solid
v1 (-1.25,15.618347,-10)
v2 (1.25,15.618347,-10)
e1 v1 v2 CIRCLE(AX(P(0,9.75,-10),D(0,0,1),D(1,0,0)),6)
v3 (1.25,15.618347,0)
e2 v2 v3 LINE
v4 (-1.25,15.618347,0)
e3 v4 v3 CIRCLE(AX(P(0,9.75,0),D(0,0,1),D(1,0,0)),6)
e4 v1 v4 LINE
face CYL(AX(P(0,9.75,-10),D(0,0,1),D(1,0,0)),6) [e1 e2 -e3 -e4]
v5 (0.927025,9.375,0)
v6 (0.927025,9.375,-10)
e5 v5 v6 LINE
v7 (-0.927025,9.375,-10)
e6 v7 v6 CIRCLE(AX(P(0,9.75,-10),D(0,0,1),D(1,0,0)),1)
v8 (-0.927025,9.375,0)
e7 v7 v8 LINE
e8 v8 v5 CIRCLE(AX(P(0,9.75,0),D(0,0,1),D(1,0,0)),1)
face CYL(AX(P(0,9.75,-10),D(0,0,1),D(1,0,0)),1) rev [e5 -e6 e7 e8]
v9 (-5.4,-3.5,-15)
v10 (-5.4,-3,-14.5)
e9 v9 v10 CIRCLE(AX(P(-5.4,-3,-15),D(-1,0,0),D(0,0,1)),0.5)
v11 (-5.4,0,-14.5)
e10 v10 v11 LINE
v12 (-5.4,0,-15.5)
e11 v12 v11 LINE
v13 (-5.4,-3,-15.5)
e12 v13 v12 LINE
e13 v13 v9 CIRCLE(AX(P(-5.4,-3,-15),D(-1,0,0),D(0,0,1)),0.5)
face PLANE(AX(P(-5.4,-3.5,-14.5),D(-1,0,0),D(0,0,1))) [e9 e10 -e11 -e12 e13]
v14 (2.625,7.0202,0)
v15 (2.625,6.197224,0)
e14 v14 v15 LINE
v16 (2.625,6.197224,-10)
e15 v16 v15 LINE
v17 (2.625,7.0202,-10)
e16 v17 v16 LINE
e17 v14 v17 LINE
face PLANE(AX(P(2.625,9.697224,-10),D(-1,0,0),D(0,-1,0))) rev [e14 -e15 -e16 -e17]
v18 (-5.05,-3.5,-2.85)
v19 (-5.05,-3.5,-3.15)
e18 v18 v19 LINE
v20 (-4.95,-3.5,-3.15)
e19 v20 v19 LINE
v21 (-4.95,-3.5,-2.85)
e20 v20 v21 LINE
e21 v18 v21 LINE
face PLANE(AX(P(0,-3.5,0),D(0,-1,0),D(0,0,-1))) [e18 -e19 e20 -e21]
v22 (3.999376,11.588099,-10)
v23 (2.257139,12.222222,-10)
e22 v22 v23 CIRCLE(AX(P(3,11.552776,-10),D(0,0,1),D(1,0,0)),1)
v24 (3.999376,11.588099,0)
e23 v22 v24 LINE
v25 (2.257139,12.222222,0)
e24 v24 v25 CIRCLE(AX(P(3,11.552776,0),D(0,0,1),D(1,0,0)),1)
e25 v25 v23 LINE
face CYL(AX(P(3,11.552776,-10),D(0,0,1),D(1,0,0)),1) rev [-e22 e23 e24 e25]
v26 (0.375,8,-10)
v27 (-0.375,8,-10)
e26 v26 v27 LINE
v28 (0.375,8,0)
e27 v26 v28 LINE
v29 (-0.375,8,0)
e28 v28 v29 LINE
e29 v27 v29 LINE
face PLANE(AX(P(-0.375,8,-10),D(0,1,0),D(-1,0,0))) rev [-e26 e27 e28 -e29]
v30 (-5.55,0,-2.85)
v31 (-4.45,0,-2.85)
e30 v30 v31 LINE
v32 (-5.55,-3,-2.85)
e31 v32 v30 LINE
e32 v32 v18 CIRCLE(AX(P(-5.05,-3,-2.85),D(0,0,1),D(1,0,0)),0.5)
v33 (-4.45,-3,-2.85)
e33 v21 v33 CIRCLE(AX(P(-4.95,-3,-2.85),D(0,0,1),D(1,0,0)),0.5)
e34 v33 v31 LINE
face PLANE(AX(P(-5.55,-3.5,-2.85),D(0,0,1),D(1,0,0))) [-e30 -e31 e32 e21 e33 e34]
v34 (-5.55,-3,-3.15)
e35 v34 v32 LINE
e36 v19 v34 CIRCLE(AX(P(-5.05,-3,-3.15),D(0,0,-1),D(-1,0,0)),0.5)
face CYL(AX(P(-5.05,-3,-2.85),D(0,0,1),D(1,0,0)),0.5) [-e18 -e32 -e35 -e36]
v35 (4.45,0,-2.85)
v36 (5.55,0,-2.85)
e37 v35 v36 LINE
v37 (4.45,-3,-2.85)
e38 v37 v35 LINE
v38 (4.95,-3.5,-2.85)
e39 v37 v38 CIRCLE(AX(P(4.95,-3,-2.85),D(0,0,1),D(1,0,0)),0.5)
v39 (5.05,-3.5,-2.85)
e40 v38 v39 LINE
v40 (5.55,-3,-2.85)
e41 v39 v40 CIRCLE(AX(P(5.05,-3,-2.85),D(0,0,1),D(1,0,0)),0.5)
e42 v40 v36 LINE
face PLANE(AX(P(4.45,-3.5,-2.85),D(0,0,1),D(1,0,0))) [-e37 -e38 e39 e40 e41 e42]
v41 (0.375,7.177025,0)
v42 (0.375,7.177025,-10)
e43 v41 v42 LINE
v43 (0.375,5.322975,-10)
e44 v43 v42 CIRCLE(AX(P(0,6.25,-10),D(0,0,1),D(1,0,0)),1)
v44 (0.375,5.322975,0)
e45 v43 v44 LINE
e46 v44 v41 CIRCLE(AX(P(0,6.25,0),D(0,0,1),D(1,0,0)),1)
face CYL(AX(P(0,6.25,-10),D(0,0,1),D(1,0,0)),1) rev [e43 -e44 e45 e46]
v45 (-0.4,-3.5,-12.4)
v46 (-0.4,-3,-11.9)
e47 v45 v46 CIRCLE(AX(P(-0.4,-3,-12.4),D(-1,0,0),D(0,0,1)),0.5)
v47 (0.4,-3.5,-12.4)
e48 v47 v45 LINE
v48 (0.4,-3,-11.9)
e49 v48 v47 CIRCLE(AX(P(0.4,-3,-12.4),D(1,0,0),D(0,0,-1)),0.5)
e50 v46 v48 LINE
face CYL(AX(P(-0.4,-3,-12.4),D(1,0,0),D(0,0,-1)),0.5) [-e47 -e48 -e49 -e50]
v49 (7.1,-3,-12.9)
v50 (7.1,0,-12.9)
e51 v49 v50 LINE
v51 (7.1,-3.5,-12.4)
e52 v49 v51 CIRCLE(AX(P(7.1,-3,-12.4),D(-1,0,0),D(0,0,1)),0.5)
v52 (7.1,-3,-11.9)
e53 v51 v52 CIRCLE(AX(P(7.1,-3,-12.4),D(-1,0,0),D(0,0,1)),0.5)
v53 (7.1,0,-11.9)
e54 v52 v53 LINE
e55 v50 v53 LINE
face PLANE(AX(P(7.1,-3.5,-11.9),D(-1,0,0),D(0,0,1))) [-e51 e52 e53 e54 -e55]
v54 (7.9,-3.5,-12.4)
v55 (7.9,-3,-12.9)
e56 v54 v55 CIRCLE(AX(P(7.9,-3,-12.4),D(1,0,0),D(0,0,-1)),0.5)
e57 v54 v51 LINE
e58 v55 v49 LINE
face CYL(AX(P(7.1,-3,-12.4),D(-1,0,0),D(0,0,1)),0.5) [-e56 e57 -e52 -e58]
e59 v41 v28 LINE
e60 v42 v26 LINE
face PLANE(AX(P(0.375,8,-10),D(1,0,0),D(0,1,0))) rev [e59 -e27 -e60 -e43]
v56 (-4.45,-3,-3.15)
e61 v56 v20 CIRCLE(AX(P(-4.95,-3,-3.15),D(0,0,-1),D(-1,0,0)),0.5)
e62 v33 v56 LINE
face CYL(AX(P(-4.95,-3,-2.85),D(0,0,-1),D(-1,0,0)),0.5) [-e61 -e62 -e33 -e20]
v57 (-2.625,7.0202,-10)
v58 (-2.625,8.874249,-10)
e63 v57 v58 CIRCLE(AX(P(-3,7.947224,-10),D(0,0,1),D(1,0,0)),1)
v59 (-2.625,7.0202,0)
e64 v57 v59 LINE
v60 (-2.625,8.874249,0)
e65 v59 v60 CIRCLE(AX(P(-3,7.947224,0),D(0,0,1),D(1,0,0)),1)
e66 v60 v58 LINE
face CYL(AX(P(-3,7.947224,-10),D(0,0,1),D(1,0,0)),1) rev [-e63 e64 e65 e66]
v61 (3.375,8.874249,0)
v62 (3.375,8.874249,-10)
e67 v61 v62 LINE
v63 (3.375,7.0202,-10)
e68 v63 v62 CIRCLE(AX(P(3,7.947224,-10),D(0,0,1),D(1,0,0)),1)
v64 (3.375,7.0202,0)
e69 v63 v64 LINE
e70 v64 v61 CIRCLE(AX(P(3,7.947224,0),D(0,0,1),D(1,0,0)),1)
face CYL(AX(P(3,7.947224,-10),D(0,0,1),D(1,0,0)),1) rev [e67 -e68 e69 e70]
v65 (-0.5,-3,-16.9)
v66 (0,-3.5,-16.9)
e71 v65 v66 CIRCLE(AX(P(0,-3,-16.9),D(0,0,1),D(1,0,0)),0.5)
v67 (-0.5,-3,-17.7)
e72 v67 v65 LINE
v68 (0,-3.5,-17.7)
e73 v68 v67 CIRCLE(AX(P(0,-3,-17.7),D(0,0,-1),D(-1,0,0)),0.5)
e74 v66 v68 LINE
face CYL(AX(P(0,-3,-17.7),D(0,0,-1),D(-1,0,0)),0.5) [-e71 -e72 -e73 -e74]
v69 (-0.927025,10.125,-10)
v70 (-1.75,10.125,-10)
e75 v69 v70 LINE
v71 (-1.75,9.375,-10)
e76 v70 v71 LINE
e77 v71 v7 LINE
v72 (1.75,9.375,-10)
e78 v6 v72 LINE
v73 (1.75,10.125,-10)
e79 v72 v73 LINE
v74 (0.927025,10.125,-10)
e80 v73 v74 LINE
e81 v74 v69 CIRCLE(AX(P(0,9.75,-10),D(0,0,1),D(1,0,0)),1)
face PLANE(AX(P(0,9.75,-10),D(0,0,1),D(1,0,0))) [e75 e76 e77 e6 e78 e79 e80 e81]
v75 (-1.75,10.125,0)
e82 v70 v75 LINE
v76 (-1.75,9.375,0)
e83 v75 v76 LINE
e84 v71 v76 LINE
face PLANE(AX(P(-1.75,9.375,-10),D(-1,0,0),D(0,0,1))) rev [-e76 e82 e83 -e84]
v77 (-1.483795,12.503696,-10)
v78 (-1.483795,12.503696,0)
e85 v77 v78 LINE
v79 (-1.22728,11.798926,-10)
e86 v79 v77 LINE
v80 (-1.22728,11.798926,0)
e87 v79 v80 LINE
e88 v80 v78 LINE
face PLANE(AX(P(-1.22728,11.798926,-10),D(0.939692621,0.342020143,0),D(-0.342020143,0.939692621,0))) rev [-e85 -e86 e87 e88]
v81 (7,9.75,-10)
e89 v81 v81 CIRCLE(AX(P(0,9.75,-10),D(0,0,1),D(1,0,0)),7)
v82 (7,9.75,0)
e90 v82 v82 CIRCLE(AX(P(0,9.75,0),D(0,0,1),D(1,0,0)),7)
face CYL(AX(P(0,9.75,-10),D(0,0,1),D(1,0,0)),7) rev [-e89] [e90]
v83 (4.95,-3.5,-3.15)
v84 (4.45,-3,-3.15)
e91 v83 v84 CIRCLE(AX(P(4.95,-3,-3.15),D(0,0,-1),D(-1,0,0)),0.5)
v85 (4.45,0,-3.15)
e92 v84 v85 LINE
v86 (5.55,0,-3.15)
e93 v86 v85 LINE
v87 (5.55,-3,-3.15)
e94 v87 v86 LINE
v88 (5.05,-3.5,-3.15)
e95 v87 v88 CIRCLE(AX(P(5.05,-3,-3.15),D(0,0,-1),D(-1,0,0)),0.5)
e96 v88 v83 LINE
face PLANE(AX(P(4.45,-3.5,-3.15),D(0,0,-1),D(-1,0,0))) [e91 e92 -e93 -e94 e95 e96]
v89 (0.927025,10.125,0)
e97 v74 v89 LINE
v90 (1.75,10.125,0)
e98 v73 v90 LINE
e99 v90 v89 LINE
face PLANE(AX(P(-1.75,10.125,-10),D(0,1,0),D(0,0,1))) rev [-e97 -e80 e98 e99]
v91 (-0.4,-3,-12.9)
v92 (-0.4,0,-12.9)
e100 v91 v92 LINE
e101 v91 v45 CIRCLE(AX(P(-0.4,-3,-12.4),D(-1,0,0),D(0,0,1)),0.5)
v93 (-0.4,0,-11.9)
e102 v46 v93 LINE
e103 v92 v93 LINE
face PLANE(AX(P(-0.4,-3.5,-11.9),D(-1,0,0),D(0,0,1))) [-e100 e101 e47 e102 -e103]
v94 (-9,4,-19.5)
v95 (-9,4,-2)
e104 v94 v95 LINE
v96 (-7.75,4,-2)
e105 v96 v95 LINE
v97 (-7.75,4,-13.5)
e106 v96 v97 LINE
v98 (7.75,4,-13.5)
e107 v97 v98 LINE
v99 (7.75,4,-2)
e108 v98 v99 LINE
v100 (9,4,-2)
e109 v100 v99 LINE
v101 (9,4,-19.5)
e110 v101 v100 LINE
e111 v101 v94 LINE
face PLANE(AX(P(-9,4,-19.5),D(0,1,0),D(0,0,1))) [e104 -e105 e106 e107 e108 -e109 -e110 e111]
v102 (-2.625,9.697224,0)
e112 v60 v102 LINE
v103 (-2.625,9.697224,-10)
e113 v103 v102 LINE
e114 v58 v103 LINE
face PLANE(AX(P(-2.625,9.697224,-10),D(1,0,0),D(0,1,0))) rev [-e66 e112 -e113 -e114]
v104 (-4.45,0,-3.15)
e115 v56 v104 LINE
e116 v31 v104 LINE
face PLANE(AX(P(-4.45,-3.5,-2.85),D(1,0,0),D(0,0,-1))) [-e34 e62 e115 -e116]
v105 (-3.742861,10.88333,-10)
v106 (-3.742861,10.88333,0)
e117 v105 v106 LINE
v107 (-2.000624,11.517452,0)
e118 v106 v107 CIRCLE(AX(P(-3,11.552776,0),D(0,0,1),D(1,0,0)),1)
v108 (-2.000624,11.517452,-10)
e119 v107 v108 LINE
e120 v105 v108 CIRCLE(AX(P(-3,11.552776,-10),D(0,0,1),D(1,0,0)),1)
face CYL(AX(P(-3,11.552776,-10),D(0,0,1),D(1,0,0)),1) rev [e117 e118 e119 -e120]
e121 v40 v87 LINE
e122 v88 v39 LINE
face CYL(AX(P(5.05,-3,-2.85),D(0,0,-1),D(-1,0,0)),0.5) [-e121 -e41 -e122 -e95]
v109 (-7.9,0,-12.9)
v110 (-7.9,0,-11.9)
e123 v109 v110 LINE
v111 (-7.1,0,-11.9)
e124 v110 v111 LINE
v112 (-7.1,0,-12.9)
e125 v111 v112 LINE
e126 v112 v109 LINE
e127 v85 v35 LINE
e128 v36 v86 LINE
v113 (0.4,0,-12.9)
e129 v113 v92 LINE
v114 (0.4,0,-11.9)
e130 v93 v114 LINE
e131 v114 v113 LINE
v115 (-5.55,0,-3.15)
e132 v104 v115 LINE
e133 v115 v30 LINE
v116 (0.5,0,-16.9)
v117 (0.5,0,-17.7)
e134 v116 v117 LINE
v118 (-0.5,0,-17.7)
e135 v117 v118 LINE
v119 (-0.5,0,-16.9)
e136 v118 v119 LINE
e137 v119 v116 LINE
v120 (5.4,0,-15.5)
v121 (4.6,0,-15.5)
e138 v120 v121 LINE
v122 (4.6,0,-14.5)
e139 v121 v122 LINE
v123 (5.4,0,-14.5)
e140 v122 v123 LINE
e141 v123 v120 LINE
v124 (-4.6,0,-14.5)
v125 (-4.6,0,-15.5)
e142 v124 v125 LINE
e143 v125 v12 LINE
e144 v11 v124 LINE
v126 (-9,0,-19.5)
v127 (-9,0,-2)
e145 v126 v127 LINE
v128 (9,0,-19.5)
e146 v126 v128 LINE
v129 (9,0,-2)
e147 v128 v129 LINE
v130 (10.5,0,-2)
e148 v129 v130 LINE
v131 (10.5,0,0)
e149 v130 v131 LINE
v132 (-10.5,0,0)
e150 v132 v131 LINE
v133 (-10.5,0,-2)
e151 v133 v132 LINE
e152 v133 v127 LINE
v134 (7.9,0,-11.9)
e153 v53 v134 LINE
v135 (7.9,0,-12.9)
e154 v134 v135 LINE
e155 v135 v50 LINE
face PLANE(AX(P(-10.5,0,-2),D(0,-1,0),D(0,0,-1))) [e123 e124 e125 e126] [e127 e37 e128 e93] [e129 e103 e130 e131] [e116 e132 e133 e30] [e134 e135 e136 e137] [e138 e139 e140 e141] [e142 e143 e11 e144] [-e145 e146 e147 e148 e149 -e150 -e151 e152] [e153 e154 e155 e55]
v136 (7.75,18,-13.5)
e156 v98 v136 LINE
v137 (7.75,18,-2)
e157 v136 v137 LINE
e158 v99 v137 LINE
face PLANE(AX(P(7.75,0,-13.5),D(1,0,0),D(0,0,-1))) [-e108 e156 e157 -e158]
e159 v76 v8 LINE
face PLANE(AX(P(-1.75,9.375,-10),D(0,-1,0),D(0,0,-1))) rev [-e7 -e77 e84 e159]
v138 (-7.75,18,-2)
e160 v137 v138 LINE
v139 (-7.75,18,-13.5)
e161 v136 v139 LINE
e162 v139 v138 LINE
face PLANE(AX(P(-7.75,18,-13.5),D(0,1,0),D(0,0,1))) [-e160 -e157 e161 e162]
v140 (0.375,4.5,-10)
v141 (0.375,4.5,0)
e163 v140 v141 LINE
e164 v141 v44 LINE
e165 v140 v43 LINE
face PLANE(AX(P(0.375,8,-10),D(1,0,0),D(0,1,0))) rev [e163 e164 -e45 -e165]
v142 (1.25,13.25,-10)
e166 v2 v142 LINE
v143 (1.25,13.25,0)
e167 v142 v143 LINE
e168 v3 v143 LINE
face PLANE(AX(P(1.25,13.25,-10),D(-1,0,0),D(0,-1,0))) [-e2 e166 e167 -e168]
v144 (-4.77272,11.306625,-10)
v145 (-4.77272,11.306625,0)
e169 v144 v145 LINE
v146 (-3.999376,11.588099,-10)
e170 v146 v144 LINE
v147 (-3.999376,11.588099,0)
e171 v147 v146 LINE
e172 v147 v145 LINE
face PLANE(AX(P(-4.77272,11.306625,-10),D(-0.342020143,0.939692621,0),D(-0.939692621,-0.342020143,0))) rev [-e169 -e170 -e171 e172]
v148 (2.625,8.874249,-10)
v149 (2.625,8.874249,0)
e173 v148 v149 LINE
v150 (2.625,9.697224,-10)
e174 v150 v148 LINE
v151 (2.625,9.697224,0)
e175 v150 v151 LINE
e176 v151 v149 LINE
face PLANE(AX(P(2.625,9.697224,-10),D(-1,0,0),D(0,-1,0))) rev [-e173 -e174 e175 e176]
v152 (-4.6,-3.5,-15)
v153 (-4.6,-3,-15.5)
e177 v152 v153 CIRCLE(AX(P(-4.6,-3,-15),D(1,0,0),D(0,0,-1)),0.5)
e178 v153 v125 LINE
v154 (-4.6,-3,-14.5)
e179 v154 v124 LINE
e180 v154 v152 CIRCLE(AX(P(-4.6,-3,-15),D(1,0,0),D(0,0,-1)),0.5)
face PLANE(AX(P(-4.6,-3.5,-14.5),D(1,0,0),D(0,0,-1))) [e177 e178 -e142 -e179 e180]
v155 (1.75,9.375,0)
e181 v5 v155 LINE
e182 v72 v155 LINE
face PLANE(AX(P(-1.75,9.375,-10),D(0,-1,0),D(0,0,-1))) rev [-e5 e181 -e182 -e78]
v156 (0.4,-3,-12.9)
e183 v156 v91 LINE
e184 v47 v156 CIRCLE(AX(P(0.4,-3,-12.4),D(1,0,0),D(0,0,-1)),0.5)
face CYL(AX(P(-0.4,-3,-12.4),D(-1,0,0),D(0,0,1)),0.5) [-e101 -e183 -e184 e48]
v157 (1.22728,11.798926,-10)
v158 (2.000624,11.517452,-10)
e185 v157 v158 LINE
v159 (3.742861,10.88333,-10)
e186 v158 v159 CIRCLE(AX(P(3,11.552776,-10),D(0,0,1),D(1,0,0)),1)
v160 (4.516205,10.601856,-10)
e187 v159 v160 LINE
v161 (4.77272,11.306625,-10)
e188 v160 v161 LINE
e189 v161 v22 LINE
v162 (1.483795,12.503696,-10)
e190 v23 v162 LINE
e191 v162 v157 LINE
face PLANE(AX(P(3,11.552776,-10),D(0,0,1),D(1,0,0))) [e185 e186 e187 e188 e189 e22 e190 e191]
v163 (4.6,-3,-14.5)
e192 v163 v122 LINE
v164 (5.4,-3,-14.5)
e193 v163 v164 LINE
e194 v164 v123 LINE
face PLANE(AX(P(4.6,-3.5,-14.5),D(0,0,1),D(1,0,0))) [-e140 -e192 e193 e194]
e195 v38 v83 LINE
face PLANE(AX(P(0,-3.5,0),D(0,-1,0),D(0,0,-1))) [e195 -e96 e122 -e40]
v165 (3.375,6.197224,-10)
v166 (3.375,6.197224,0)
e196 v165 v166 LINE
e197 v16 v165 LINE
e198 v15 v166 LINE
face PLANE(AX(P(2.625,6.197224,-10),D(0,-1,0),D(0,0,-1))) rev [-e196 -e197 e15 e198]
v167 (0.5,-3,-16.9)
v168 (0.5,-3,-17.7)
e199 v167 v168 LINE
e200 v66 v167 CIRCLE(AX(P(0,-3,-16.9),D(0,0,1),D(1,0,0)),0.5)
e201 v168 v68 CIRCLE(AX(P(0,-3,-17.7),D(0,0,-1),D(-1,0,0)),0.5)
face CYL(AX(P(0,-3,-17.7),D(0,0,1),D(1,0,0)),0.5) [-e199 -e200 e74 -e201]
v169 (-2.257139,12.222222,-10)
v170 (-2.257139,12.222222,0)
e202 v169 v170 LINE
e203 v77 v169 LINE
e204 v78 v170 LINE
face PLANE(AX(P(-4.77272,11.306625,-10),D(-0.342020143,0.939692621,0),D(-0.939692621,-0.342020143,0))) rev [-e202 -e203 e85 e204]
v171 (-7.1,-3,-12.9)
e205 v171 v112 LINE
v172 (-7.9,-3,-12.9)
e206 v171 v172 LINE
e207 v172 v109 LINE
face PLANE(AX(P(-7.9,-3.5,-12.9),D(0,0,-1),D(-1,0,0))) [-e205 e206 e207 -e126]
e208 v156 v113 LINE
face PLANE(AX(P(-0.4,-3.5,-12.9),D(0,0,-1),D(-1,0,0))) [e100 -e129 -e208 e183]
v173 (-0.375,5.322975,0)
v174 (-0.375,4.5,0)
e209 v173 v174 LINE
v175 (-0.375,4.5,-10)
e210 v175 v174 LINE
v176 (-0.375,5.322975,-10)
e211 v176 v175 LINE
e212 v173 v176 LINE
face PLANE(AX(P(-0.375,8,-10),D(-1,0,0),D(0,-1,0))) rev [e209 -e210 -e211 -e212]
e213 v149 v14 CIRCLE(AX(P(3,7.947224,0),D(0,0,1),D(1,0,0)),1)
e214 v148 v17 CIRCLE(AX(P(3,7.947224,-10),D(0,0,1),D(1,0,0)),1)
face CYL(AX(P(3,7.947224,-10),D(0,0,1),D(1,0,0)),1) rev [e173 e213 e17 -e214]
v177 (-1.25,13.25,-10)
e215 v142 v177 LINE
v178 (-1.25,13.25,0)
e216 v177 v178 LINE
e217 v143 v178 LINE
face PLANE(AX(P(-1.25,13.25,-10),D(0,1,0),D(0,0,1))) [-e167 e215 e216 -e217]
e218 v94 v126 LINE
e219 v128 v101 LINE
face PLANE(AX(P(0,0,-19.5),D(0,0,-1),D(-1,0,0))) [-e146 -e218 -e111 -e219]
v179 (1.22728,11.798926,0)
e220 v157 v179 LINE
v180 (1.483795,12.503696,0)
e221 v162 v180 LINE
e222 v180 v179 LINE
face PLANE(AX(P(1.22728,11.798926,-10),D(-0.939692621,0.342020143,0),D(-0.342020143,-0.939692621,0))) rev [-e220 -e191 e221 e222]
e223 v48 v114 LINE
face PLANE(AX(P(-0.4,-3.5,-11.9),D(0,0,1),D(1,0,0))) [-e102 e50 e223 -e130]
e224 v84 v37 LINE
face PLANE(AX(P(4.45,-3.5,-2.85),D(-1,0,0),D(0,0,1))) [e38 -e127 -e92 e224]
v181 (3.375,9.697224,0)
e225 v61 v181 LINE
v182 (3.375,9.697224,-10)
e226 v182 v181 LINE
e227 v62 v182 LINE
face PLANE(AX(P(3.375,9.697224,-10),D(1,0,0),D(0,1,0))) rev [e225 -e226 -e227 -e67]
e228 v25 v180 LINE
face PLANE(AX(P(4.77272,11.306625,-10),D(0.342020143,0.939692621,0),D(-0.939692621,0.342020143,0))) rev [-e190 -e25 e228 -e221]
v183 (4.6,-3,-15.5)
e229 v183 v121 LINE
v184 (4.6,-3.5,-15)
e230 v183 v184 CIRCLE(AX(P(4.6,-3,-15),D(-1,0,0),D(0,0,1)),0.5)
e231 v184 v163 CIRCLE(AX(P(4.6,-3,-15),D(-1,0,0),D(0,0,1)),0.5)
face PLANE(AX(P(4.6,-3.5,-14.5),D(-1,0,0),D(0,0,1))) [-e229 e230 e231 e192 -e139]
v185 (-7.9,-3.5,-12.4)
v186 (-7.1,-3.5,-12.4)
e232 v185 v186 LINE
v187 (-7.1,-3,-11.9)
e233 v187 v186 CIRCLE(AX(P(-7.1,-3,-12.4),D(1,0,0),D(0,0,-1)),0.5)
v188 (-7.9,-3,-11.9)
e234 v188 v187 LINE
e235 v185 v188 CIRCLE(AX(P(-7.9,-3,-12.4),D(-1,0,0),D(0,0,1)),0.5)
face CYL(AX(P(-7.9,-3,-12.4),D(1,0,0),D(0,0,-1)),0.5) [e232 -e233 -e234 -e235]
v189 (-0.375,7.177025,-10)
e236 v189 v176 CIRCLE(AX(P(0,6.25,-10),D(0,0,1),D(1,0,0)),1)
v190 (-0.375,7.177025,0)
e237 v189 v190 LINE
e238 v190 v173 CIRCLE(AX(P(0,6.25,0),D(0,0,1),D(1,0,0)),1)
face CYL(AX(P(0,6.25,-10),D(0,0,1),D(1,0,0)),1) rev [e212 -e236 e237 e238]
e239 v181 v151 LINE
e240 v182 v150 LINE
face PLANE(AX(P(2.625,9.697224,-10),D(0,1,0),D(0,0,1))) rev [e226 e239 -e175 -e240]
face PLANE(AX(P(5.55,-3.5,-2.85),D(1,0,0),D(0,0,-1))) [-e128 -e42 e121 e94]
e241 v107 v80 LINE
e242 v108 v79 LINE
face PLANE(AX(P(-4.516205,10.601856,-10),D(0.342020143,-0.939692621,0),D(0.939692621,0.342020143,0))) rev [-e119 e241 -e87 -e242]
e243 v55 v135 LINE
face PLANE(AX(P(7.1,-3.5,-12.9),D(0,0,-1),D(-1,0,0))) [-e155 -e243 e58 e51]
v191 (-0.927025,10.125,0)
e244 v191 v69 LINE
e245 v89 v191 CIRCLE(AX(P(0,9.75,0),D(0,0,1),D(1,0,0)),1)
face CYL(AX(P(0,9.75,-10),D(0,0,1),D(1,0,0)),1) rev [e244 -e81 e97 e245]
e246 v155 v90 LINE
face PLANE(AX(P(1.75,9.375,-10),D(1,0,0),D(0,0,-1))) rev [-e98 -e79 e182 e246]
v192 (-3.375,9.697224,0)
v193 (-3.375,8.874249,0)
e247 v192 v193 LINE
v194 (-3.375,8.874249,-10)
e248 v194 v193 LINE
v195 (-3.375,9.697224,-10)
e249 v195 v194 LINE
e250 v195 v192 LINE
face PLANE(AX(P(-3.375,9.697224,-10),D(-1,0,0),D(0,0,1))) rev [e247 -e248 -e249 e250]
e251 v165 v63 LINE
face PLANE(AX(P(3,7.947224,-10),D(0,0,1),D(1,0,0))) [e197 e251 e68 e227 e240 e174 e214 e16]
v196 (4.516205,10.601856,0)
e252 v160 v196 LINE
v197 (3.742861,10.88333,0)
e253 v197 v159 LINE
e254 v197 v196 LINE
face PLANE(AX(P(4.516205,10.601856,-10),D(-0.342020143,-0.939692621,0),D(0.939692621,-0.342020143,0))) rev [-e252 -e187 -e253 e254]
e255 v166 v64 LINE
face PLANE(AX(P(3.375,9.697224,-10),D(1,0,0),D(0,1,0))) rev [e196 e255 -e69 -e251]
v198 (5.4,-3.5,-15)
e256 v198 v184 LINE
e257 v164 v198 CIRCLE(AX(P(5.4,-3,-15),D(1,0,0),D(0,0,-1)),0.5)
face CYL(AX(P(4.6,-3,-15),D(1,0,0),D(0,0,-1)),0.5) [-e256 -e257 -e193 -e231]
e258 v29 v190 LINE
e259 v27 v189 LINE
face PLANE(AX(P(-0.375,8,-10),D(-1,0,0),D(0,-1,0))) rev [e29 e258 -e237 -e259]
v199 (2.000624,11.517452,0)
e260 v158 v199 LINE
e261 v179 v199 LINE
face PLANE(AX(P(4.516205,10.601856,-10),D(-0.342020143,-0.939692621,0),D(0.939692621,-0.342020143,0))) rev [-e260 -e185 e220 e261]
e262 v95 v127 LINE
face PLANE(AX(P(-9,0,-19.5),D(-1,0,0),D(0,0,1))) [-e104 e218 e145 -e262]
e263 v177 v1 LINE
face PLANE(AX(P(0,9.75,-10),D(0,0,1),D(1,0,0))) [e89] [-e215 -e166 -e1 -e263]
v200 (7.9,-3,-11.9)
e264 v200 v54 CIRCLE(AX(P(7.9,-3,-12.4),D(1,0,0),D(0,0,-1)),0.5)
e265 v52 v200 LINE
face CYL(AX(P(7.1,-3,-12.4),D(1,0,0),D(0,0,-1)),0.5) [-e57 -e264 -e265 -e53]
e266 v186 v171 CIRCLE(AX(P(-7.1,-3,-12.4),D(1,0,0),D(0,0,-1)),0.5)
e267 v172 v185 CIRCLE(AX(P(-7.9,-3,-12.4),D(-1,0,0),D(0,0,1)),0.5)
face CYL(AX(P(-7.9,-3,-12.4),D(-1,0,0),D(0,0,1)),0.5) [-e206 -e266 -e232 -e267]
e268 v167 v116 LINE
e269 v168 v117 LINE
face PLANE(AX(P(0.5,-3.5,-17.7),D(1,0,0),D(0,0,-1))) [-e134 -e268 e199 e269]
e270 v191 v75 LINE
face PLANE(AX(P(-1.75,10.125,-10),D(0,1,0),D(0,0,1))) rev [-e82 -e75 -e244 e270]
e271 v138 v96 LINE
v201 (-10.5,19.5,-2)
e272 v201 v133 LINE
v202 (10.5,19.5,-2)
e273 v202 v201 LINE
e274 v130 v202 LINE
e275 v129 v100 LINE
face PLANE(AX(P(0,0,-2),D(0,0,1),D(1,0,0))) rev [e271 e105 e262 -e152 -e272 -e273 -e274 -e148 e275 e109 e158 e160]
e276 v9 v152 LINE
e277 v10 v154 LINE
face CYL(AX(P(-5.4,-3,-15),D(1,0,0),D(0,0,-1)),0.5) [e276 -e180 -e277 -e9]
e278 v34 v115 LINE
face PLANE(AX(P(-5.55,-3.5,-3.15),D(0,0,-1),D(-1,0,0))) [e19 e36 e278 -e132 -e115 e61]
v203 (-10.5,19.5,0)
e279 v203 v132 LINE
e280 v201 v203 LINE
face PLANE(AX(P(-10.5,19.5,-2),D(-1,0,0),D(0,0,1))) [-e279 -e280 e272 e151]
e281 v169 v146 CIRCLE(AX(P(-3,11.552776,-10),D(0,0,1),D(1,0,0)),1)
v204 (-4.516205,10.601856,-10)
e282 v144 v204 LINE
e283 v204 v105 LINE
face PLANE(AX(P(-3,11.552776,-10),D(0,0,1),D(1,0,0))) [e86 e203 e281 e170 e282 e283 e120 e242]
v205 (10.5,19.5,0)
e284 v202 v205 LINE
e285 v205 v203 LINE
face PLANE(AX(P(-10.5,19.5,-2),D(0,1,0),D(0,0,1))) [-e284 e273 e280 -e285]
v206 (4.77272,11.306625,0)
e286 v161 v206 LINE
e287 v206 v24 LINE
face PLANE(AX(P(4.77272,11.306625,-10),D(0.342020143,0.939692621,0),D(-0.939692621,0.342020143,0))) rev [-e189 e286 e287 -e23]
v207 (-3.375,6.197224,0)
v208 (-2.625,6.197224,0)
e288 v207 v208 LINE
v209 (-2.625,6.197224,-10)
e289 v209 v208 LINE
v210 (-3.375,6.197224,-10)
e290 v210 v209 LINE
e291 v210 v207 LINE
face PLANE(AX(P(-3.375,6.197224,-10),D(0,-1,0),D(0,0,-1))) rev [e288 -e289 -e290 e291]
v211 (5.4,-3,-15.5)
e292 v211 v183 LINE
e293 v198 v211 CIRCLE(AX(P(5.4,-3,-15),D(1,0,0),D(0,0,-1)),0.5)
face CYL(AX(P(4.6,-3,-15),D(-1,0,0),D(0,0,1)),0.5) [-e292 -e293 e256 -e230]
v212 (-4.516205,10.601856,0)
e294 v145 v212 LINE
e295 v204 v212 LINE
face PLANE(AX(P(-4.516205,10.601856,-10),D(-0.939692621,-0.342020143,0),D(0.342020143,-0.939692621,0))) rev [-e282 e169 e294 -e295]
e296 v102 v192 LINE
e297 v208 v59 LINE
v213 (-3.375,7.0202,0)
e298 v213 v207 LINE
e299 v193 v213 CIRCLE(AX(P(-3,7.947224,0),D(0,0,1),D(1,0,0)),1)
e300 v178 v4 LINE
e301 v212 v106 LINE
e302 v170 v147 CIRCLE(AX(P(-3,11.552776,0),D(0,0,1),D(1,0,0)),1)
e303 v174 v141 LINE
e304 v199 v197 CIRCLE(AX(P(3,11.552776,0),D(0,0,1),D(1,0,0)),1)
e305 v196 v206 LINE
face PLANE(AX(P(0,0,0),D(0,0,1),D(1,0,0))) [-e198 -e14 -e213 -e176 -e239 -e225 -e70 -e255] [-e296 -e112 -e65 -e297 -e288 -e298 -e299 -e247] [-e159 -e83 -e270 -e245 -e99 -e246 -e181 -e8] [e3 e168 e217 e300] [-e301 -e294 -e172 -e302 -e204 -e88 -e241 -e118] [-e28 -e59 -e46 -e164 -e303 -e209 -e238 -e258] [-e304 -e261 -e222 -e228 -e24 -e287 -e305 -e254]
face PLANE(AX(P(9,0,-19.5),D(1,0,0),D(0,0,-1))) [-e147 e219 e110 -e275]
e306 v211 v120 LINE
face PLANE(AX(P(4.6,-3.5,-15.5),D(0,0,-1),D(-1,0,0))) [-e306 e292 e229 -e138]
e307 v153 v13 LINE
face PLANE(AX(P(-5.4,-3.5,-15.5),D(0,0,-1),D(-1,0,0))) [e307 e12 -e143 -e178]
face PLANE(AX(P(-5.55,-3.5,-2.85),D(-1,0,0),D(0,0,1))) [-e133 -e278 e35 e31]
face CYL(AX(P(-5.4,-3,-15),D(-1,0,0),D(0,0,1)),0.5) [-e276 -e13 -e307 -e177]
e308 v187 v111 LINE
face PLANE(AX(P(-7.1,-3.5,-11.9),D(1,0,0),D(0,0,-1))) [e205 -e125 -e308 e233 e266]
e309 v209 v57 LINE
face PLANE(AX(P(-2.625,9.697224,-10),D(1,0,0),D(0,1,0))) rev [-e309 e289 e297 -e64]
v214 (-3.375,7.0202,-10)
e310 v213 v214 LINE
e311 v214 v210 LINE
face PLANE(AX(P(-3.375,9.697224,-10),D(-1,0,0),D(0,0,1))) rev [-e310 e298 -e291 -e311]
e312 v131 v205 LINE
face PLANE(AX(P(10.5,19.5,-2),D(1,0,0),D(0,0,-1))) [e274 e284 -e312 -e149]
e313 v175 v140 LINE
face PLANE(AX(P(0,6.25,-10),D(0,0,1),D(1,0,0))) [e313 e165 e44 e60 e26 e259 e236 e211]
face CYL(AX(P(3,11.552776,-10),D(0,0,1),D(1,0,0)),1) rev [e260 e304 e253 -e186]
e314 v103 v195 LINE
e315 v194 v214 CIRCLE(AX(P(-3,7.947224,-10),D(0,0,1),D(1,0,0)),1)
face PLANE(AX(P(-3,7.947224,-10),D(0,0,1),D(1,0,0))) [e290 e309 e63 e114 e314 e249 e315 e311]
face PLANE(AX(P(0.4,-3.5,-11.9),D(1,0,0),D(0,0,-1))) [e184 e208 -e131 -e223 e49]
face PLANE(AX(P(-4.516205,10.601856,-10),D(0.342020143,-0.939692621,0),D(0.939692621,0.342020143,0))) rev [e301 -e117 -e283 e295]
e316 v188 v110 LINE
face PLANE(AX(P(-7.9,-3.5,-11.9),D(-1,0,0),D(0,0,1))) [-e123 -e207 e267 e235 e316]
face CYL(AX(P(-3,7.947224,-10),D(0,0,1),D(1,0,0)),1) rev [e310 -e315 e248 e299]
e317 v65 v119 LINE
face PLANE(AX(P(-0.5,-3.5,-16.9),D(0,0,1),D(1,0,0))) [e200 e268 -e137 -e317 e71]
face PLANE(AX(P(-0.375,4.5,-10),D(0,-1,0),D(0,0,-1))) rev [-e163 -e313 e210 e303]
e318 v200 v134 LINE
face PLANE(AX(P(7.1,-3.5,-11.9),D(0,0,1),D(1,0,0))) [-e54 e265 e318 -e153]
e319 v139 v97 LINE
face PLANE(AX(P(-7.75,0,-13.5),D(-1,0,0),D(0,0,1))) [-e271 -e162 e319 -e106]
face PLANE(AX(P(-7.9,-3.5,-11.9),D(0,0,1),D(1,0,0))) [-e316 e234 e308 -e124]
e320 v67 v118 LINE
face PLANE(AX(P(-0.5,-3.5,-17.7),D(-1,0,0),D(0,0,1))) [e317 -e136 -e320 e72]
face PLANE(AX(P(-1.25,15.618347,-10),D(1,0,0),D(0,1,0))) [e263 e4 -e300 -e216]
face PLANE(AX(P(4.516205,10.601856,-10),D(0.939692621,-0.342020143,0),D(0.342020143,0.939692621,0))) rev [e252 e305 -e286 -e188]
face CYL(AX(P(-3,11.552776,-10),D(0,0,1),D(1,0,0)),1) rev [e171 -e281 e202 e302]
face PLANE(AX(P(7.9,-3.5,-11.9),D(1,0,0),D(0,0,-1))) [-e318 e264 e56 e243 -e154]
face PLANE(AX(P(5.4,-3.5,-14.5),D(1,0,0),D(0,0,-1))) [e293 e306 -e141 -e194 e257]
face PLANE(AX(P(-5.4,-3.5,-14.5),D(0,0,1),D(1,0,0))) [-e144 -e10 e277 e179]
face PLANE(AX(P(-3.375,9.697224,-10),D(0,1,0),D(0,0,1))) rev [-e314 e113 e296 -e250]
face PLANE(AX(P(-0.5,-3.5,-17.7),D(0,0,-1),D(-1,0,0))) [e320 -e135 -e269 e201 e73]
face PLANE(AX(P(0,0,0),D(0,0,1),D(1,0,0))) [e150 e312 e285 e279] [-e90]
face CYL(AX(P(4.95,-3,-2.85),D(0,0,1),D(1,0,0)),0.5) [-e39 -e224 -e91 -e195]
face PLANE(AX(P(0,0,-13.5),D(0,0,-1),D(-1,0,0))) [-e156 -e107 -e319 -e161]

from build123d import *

# Parameters (mm, degrees)
SKETCH_1_W          = 21
SKETCH_1_H          = 19.5
EXTRUDE_1_DEPTH     = 2
SKETCH_3_W          = 15.5
SKETCH_3_H          = 18
EXTRUDE_2_DEPTH     = 13.5
SKETCH_4_W          = 18
SKETCH_4_H          = 4
EXTRUDE_3_DEPTH     = 19.5
SKETCH_2_R          = 7
CUT_EXTRUDE_1_DEPTH = 10
SKETCH_5_R          = 1
CUT_EXTRUDE_2_DEPTH = 10
SKETCH_6_W          = 0.75
SKETCH_6_H          = 3.5
SKETCH_6_W_2        = 3.5
SKETCH_6_H_2        = 0.75
CUT_EXTRUDE_3_DEPTH = 10
SKETCH_7_W          = 1.1
SKETCH_7_H          = 0.3
SKETCH_7_W_2        = 0.8
SKETCH_7_H_2        = 1
SKETCH_7_W_3        = 1
SKETCH_7_H_3        = 0.8
EXTRUDE_4_DEPTH     = 3.5
FILLET_1_R          = 0.5


with BuildPart() as part:
    # Эскиз1 → Бобышка-Вытянуть1 (new body)
    with BuildSketch(Plane.XY):
        with Locations((0, 9.75)):
            Rectangle(SKETCH_1_W, SKETCH_1_H)
    extrude(amount=-EXTRUDE_1_DEPTH)

    # Эскиз3 → Бобышка-Вытянуть2 (add)
    with BuildSketch(Plane.XY):
        with Locations((0, 9)):
            Rectangle(SKETCH_3_W, SKETCH_3_H)
    extrude(amount=-EXTRUDE_2_DEPTH)

    # Эскиз4 → Бобышка-Вытянуть3 (add)
    with BuildSketch(Plane.XY):
        with Locations((0, 2)):
            Rectangle(SKETCH_4_W, SKETCH_4_H)
    extrude(amount=-EXTRUDE_3_DEPTH)

    # Эскиз2 → Вырез-Вытянуть1 (cut)
    with BuildSketch(Plane.XY):
        with Locations((0, 9.75)):
            Circle(SKETCH_2_R)
        with BuildLine():
            Line((-1.25, 15.618347297), (-1.25, 13.25))
            Line((-1.25, 13.25), (1.25, 13.25))
            Line((1.25, 13.25), (1.25, 15.618347297))
            ThreePointArc((1.25, 15.618347297), (0, 3.75), (-1.25, 15.618347297))
        make_face(mode=Mode.SUBTRACT)
    extrude(amount=-CUT_EXTRUDE_1_DEPTH, mode=Mode.SUBTRACT)

    # Эскиз5 → Вырез-Вытянуть2 (cut)
    with BuildSketch(Plane.XY):
        with Locations((0, 6.25)):
            Circle(SKETCH_5_R)
        with Locations((-3, 7.947224362)):
            Circle(SKETCH_5_R)
        with Locations((3, 7.947224362)):
            Circle(SKETCH_5_R)
        with Locations((-3, 11.552775638)):
            Circle(SKETCH_5_R)
        with Locations((3, 11.552775638)):
            Circle(SKETCH_5_R)
        with Locations((0, 9.75)):
            Circle(SKETCH_5_R)
    extrude(amount=-CUT_EXTRUDE_2_DEPTH, mode=Mode.SUBTRACT)

    # Эскиз6 → Вырез-Вытянуть3 (cut)
    with BuildSketch(Plane.XY):
        Polygon((4.516204533, 10.601855654), (1.22728036, 11.798926156), (1.483795467, 12.503695621), (4.77271964, 11.30662512), align=None)
        with Locations((-3, 7.947224362)):
            Rectangle(SKETCH_6_W, SKETCH_6_H)
        with Locations((3, 7.947224362)):
            Rectangle(SKETCH_6_W, SKETCH_6_H)
        with Locations((0, 6.25)):
            Rectangle(SKETCH_6_W, SKETCH_6_H)
        Polygon((-4.516204533, 10.601855654), (-1.22728036, 11.798926156), (-1.483795467, 12.503695621), (-4.77271964, 11.30662512), align=None)
        with Locations((0, 9.75)):
            Rectangle(SKETCH_6_W_2, SKETCH_6_H_2)
    extrude(amount=-CUT_EXTRUDE_3_DEPTH, mode=Mode.SUBTRACT)

    # Эскиз7 → Бобышка-Вытянуть4 (add)
    with BuildSketch(Plane(origin=(0, 0, 0), x_dir=(1, 0, 0), z_dir=(0, 1, 0))):
        with Locations((-5, 3)):
            Rectangle(SKETCH_7_W, SKETCH_7_H)
        with Locations((5, 3)):
            Rectangle(SKETCH_7_W, SKETCH_7_H)
        with Locations((-7.5, 12.4)):
            Rectangle(SKETCH_7_W_2, SKETCH_7_H_2)
        with Locations((0, 12.4)):
            Rectangle(SKETCH_7_W_2, SKETCH_7_H_2)
        with Locations((7.5, 12.4)):
            Rectangle(SKETCH_7_W_2, SKETCH_7_H_2)
        with Locations((-5, 15)):
            Rectangle(SKETCH_7_W_2, SKETCH_7_H_2)
        with Locations((5, 15)):
            Rectangle(SKETCH_7_W_2, SKETCH_7_H_2)
        with Locations((0, 17.3)):
            Rectangle(SKETCH_7_W_3, SKETCH_7_H_3)
    extrude(amount=-EXTRUDE_4_DEPTH)

    # Скругление1
    fillet_1_edges = [part.edges().sort_by_distance(p)[0] for p in [
        (5.55, -3.5, -3),
        (4.45, -3.5, -3),
        (-4.45, -3.5, -3),
        (-5.55, -3.5, -3),
        (0.5, -3.5, -17.3),
        (-0.5, -3.5, -17.3),
        (7.5, -3.5, -12.9),
        (7.5, -3.5, -11.9),
        (5, -3.5, -15.5),
        (5, -3.5, -14.5),
        (0, -3.5, -12.9),
        (0, -3.5, -11.9),
        (-5, -3.5, -14.5),
        (-5, -3.5, -15.5),
        (-7.5, -3.5, -11.9),
        (-7.5, -3.5, -12.9),
    ]]
    fillet(fillet_1_edges, radius=FILLET_1_R - 0.0001)  # a hair under: the kernel refuses the full size


solid = part.part
